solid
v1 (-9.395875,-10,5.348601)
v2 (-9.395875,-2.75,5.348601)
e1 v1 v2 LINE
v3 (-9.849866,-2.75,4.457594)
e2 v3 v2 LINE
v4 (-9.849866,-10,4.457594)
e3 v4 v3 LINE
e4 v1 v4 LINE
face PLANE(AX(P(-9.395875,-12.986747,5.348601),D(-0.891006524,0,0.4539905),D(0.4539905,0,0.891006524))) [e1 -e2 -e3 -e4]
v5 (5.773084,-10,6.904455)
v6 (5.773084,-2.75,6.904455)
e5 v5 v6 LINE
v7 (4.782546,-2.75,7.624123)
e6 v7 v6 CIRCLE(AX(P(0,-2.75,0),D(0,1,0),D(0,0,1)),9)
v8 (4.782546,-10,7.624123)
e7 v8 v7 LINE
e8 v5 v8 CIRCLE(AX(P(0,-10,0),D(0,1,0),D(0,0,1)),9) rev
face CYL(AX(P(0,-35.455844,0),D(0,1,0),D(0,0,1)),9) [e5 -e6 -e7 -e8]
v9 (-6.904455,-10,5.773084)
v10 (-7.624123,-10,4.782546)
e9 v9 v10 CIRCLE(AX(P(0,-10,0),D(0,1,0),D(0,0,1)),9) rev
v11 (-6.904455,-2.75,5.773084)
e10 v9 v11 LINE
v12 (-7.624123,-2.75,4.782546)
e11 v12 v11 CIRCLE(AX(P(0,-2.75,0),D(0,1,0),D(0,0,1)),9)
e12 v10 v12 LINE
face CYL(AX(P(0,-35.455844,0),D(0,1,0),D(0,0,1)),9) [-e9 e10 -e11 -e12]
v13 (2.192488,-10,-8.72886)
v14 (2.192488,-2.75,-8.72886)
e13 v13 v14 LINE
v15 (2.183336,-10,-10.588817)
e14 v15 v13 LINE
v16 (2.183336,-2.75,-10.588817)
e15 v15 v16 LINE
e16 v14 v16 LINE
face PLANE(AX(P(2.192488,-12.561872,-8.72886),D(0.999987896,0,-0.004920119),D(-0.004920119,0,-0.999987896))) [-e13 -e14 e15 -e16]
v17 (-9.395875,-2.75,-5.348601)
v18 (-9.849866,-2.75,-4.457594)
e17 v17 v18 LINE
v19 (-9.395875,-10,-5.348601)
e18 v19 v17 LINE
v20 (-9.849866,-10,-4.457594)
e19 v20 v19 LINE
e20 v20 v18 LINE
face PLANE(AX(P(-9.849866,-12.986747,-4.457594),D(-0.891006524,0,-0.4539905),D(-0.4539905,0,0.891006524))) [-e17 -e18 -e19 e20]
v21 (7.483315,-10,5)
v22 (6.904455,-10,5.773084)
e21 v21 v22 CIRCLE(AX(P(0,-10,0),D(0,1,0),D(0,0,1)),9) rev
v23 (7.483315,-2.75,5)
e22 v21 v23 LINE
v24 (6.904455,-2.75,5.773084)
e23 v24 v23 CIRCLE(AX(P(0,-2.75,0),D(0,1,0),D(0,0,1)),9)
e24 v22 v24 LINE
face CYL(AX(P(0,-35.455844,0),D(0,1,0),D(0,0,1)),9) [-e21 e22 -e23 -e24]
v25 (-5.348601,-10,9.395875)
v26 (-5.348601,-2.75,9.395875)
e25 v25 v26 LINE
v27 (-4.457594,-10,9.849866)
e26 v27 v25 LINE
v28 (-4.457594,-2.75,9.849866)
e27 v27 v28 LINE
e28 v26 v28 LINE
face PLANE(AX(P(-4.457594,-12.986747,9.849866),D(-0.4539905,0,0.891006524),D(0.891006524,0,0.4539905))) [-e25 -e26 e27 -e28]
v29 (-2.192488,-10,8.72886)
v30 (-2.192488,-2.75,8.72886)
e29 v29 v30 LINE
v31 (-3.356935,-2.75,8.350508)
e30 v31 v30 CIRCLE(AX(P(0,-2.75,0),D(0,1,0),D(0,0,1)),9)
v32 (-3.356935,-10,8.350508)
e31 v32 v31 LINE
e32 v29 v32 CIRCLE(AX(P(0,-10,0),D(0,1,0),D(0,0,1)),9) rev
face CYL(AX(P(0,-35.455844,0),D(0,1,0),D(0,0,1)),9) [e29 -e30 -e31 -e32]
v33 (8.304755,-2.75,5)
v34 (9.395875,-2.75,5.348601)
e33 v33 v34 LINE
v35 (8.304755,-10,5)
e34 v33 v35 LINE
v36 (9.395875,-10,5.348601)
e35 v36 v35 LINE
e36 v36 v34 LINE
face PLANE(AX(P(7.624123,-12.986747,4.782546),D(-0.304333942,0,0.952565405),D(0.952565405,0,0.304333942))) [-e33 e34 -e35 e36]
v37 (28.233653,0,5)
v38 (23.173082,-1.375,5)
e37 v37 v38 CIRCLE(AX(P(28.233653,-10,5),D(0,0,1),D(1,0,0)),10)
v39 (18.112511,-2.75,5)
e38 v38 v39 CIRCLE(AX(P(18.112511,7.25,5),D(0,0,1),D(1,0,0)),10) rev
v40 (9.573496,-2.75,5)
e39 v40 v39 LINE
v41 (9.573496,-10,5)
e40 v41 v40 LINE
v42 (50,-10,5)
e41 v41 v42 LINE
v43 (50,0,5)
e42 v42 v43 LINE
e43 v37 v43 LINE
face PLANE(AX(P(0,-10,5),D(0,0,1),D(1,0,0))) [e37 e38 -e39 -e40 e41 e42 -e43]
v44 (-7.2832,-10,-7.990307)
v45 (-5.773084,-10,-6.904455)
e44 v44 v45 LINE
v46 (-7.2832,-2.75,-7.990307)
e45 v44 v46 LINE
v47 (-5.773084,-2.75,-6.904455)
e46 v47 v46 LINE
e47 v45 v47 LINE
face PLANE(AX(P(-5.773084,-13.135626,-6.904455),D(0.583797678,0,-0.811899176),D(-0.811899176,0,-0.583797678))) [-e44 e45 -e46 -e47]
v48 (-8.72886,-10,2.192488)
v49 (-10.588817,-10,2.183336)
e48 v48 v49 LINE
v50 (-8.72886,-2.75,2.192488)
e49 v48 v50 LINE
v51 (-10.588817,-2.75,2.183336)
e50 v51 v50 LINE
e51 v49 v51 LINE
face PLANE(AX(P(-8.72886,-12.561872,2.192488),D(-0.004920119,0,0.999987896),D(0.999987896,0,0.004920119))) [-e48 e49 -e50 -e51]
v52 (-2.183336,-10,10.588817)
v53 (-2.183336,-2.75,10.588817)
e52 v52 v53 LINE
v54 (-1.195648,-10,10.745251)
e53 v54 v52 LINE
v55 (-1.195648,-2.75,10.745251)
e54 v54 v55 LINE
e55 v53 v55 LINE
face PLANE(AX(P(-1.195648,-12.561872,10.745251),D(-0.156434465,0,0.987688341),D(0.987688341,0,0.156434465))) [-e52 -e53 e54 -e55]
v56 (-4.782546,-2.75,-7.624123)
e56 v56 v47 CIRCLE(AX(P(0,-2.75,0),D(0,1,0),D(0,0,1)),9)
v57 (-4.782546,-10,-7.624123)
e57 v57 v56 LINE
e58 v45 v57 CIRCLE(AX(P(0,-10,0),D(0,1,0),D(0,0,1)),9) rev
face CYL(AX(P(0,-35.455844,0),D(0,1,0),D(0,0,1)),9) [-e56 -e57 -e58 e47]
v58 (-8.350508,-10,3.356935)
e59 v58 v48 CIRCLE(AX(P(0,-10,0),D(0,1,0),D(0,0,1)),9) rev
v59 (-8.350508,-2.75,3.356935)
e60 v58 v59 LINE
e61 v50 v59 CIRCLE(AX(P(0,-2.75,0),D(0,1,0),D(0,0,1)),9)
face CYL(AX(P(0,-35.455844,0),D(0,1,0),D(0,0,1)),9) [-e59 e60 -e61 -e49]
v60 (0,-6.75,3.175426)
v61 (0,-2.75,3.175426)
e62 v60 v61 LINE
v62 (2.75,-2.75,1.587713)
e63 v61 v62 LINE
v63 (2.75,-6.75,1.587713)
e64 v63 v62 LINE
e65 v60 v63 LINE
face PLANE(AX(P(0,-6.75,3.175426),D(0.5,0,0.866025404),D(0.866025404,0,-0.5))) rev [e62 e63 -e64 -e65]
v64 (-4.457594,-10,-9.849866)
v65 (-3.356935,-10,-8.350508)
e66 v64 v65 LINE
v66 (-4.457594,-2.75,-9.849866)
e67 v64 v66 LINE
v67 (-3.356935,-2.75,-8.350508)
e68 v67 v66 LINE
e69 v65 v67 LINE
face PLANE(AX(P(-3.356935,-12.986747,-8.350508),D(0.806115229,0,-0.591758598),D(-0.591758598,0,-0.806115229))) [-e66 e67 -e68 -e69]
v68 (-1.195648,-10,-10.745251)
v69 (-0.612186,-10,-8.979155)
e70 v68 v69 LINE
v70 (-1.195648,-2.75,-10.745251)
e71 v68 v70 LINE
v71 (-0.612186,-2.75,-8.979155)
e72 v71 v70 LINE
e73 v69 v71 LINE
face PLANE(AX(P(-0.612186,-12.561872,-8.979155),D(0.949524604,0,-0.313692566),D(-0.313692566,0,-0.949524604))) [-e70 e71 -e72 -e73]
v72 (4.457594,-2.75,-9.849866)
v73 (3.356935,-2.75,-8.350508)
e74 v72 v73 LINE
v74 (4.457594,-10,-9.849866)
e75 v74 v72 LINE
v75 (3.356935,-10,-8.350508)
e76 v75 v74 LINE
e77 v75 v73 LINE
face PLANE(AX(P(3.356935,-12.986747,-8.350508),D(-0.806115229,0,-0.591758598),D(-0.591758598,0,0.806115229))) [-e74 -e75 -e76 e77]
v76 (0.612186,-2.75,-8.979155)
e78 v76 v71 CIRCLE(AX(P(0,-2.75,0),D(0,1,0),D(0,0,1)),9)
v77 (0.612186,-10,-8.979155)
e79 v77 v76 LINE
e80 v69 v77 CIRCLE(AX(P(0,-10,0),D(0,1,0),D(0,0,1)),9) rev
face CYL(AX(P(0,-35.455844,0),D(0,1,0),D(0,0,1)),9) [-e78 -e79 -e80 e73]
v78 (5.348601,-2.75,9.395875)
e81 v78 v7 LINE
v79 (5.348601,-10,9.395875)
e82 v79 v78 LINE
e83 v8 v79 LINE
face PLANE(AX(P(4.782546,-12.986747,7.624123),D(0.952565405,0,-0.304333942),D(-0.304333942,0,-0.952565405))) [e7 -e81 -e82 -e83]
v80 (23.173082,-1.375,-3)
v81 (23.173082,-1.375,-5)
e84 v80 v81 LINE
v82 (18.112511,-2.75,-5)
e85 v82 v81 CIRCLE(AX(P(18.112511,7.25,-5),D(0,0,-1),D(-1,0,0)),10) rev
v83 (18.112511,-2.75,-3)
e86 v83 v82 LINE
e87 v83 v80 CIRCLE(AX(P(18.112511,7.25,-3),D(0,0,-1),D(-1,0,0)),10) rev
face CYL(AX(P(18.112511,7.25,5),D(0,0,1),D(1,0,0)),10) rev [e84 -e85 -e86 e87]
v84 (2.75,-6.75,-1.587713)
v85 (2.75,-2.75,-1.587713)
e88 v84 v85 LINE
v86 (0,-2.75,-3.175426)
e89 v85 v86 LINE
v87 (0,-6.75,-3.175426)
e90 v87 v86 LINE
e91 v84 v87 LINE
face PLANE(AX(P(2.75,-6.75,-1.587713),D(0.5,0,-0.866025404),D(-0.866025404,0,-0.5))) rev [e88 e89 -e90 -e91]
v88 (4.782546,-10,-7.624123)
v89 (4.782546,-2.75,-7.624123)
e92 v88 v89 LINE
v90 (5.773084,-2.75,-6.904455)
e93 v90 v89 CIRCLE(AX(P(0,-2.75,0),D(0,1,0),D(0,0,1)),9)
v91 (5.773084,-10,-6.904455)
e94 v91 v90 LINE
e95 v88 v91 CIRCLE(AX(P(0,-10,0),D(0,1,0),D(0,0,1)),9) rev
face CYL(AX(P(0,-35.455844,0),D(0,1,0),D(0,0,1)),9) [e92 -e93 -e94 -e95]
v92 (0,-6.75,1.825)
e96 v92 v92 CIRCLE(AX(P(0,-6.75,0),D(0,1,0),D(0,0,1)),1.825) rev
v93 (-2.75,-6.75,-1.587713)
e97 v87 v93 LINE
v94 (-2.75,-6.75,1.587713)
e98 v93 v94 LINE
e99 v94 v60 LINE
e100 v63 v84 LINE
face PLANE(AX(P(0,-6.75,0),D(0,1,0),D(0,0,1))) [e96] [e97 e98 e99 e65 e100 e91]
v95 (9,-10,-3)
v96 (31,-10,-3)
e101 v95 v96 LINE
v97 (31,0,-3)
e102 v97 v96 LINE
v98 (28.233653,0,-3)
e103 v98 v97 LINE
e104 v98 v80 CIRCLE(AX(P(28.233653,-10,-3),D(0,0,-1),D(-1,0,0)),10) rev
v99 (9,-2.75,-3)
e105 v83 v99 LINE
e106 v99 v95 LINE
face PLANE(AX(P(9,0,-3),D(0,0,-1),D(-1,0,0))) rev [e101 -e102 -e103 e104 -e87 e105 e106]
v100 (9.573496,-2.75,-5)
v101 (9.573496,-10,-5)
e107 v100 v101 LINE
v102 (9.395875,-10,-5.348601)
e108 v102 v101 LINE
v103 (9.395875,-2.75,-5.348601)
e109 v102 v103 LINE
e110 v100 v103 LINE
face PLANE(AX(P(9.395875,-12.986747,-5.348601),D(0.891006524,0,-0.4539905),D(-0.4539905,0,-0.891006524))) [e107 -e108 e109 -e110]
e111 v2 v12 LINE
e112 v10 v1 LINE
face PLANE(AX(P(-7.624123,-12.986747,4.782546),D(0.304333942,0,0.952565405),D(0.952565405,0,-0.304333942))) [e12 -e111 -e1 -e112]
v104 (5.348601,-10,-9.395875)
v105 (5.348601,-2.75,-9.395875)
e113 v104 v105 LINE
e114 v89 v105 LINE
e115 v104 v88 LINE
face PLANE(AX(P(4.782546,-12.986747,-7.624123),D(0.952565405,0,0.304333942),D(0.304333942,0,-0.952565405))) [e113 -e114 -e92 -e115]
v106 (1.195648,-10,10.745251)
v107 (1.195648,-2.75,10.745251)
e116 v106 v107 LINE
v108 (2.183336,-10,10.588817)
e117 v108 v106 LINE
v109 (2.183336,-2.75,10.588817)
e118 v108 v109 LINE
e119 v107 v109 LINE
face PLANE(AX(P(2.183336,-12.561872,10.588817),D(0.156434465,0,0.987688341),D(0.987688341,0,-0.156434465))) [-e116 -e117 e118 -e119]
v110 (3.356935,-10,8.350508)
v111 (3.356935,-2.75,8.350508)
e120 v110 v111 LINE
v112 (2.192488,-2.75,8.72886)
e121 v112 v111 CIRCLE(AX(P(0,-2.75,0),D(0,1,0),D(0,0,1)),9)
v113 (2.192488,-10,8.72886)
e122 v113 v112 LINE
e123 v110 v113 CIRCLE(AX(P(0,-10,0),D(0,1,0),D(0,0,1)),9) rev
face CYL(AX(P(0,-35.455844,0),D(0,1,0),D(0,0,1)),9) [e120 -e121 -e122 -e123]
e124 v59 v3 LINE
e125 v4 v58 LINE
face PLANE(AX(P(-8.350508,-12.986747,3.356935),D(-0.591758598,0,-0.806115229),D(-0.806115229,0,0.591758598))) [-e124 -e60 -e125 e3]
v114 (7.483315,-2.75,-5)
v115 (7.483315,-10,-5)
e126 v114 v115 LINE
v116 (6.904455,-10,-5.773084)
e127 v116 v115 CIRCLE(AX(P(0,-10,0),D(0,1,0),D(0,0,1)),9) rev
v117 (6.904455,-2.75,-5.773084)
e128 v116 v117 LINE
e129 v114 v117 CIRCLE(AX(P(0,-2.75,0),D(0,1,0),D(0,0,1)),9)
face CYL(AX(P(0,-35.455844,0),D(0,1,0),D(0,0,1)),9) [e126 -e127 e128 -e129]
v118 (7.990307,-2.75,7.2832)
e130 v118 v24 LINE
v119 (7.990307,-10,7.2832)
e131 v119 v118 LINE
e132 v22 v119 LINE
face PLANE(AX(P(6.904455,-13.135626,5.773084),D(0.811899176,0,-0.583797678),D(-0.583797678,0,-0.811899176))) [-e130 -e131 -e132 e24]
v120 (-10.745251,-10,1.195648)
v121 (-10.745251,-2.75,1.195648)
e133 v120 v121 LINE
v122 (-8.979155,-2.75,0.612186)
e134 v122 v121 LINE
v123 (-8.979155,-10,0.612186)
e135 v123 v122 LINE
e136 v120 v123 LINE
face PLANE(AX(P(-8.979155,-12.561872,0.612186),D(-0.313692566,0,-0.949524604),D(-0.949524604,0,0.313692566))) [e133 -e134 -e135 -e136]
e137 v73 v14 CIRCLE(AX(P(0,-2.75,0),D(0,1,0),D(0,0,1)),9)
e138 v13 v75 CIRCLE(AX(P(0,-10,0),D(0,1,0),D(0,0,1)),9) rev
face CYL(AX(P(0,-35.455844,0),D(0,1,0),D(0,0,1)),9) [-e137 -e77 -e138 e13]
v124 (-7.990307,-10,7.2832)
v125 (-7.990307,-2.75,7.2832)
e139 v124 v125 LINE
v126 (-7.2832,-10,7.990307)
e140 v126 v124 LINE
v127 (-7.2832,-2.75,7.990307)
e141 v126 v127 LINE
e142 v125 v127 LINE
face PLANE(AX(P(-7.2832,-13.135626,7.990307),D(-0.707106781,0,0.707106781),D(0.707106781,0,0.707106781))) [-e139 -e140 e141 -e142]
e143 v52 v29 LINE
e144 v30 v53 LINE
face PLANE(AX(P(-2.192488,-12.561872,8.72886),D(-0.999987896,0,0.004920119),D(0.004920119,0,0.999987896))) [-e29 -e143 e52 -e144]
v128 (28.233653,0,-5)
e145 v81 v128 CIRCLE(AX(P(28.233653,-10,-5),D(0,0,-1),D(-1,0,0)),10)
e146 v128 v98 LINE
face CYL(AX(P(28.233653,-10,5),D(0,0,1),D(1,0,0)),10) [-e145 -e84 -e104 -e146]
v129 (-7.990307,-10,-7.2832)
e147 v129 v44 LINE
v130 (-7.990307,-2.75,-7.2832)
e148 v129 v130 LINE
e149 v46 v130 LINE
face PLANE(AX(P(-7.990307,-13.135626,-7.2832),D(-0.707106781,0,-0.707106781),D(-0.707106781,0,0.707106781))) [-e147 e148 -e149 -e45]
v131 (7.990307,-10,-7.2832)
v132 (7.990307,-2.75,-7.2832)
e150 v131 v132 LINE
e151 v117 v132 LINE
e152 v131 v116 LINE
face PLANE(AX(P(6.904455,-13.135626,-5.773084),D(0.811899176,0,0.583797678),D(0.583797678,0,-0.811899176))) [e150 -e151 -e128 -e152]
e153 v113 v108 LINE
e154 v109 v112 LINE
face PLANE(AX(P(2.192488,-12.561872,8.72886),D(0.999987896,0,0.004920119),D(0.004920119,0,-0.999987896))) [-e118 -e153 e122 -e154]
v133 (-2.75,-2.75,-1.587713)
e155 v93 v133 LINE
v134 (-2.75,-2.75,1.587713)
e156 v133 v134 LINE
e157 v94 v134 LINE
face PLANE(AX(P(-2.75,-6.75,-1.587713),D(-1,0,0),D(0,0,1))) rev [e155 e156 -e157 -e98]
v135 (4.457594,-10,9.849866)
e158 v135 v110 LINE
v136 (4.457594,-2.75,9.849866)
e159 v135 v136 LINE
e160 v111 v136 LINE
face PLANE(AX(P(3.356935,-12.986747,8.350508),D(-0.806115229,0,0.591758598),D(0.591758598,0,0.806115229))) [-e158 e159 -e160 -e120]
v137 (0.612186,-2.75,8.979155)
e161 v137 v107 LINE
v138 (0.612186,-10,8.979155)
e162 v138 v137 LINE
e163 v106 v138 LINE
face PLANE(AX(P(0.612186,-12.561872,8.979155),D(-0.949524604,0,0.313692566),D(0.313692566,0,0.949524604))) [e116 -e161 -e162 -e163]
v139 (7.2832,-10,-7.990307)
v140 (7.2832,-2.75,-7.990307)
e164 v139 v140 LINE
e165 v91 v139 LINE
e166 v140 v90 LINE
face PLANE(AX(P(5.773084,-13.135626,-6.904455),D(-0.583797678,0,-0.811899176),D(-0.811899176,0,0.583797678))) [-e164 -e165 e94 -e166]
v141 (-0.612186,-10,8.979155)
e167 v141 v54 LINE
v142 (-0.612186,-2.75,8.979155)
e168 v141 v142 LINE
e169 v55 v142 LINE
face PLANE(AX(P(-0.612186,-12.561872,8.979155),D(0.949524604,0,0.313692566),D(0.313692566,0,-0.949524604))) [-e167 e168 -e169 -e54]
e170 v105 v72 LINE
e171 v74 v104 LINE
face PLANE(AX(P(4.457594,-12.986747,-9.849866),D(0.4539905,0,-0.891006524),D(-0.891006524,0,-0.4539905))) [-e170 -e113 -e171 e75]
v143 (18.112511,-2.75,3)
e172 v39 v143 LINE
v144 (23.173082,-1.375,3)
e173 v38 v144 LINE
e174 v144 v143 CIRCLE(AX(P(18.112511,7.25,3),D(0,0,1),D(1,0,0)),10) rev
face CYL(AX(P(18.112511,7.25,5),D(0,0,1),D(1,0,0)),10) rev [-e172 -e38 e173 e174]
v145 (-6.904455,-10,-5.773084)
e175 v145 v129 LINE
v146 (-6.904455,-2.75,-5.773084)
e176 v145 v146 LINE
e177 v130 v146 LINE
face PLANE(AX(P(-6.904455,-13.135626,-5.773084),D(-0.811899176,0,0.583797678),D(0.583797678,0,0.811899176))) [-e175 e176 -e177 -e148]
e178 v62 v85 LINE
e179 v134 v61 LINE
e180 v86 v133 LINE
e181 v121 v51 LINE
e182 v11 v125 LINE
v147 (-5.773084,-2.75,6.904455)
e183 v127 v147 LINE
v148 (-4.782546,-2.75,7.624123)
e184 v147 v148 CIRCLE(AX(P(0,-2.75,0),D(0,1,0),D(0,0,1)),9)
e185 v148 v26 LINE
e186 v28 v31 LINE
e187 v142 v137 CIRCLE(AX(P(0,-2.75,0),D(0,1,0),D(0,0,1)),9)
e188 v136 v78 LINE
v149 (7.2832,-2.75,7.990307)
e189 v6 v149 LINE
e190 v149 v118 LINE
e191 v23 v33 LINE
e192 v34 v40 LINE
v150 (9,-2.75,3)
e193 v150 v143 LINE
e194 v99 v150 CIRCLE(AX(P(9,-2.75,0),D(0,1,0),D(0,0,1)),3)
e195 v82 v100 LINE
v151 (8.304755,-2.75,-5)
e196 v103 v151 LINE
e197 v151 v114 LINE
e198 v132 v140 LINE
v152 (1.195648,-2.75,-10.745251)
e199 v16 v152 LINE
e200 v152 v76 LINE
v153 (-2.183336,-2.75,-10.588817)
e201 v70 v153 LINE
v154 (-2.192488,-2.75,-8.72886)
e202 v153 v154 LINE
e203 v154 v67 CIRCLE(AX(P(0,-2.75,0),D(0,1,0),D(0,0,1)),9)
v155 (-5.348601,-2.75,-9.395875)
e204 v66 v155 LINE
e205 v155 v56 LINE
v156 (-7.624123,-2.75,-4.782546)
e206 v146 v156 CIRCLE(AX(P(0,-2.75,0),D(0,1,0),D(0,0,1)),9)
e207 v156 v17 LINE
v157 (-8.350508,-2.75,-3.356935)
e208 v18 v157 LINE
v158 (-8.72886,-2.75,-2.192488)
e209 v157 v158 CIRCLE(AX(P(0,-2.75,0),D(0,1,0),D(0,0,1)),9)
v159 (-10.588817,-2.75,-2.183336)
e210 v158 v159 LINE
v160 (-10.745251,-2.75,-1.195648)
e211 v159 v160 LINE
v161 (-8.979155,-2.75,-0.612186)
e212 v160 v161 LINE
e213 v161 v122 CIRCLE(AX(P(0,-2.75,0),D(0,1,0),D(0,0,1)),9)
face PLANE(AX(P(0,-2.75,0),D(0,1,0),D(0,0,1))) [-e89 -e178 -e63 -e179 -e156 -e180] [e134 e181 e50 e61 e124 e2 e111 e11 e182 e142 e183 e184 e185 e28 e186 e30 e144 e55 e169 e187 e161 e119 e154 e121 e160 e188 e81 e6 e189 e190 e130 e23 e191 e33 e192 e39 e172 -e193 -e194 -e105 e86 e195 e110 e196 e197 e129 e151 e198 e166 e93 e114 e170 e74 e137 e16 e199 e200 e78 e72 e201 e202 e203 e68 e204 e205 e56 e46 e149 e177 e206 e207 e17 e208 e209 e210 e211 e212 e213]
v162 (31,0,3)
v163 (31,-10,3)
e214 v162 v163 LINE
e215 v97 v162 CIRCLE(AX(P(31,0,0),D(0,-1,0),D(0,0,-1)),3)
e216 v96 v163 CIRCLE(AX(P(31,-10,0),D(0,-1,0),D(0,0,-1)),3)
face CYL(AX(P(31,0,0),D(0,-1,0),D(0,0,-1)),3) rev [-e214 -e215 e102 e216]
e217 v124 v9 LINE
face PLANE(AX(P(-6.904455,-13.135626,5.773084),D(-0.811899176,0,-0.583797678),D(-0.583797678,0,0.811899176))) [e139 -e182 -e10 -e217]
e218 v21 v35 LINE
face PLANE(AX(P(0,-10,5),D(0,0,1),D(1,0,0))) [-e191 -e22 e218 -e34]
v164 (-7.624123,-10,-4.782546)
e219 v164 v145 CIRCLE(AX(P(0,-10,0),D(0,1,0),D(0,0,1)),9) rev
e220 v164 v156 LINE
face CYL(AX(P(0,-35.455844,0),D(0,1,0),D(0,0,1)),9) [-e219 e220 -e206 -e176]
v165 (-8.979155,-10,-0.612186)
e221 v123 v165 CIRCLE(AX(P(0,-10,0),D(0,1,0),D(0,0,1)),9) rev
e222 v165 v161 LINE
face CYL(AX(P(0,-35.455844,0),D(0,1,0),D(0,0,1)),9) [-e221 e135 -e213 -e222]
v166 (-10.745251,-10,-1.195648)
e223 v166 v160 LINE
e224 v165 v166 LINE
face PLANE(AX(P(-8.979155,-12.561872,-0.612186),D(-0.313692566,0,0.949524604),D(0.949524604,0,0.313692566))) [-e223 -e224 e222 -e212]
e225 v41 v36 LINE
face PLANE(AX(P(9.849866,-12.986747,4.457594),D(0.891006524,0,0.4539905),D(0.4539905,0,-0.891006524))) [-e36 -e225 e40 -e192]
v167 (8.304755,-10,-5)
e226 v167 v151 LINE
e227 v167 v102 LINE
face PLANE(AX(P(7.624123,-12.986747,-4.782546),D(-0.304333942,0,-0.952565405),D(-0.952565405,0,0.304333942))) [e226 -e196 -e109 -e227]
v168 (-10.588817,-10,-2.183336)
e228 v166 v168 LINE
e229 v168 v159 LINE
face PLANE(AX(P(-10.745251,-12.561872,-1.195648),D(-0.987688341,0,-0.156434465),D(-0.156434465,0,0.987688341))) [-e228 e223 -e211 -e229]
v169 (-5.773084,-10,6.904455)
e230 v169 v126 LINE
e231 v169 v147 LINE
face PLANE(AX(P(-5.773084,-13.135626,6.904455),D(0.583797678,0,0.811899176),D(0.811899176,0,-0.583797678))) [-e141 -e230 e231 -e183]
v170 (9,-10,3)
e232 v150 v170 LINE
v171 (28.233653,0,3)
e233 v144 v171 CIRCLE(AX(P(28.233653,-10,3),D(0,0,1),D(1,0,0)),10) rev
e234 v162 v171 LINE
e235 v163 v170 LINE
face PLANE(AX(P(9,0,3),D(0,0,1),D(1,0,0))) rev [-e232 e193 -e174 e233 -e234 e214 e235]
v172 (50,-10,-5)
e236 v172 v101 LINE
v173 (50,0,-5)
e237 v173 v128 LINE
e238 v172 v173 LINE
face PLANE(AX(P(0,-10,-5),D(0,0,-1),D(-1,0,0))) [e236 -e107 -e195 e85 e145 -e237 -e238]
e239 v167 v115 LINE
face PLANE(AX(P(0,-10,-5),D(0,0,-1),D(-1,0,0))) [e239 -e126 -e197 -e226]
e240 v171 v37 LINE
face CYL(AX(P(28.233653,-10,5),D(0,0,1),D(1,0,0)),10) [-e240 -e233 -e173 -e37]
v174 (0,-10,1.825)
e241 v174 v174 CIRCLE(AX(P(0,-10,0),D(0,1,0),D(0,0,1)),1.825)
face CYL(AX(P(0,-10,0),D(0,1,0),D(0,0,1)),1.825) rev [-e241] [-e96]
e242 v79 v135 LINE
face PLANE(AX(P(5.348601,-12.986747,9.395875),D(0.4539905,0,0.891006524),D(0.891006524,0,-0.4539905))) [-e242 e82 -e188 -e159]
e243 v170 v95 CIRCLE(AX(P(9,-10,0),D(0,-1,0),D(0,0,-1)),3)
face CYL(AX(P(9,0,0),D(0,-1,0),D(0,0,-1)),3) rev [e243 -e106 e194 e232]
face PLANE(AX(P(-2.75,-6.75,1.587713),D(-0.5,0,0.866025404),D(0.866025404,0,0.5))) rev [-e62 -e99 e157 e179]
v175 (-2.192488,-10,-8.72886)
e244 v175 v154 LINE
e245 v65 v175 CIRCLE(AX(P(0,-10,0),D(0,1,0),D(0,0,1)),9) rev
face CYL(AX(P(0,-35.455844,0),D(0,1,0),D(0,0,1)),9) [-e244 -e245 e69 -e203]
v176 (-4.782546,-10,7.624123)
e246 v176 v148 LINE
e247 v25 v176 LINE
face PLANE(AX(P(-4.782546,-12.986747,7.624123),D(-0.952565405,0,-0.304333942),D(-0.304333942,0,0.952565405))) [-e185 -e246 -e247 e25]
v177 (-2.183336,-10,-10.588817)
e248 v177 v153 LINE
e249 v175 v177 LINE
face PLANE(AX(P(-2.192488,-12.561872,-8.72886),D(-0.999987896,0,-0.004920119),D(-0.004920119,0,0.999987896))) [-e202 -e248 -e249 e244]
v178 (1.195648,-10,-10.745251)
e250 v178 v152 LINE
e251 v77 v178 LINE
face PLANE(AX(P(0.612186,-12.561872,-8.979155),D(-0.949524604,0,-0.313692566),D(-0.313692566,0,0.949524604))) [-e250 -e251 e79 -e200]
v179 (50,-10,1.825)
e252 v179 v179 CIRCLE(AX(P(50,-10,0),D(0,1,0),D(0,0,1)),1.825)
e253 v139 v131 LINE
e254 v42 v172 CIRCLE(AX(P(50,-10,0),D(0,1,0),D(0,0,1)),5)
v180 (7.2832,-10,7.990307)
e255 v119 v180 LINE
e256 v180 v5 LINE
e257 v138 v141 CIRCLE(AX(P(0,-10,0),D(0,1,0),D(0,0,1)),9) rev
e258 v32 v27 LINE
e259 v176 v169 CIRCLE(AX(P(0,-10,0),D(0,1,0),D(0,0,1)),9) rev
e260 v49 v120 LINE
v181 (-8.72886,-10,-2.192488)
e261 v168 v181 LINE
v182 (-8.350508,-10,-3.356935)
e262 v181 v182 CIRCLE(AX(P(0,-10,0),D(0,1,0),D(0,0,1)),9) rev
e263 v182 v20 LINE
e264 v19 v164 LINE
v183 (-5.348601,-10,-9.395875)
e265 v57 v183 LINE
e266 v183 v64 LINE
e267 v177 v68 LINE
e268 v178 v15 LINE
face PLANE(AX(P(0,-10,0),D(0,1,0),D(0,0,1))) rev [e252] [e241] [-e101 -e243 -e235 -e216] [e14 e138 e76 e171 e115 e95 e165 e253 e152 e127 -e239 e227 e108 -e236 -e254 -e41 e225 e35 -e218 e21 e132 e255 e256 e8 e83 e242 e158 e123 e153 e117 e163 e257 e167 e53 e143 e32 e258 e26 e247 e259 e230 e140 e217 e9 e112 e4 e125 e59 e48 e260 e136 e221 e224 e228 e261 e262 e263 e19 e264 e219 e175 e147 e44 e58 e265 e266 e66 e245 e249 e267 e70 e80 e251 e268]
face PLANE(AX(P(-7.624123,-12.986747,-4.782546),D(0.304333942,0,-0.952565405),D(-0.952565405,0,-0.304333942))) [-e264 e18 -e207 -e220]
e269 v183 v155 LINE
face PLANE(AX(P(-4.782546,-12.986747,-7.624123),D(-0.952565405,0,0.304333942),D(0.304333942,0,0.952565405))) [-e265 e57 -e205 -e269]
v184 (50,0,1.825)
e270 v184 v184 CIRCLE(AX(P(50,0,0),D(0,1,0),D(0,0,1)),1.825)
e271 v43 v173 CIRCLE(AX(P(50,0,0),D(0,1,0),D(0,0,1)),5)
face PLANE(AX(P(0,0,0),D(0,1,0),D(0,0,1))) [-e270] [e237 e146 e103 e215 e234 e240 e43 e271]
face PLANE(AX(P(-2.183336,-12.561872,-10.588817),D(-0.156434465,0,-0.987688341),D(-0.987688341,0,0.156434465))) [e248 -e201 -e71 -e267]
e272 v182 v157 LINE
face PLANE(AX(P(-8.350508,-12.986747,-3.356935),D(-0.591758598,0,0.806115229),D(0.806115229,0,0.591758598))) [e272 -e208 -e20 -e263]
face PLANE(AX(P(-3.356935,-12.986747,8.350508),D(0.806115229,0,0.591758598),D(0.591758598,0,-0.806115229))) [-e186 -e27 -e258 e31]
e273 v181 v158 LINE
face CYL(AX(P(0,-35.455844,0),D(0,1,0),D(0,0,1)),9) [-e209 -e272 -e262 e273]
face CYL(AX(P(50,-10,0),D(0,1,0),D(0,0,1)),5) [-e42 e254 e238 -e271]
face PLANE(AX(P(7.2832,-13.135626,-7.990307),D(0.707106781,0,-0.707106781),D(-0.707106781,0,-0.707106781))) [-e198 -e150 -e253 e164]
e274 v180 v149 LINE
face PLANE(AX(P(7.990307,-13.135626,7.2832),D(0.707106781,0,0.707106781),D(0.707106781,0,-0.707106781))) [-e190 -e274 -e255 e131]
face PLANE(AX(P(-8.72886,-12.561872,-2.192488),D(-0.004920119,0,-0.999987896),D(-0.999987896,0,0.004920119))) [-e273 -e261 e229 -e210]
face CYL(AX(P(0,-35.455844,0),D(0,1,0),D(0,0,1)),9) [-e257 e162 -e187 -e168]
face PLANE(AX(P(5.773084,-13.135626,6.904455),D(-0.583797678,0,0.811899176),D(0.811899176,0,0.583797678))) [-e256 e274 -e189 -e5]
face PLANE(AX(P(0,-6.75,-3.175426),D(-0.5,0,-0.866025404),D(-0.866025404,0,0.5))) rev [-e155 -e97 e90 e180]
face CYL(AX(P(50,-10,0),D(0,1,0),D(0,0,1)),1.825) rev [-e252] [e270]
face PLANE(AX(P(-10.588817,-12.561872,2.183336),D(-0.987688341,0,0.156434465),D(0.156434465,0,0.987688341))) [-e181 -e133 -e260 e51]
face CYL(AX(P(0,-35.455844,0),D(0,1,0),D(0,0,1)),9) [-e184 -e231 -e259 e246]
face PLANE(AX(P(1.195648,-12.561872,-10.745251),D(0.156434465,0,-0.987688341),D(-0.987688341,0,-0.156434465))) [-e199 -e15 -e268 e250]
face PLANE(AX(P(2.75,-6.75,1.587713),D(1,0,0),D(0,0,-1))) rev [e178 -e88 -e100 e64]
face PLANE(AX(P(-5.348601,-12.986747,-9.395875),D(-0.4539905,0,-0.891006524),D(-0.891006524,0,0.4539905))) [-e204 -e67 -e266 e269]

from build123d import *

# Parameters (mm, degrees)
SKIZZE1_R                       = 1.825
AUFSATZ_LINEAR_AUSTRAGEN1_DEPTH = 10
SCHNITT_LINEAR_AUSTRAGEN1_DEPTH = 2.75
VERRUNDUNG1_R                   = 10
VERRUNDUNG2_R                   = 10
SKIZZE2_R                       = 9
SKIZZE2_R_2                     = 5
AUFSATZ_LINEAR_AUSTRAGEN2_DEPTH = 7.25
AUFSATZ_LINEAR_AUSTRAGEN3_DEPTH = 7.25
KREISMUSTER1_COUNT              = 20
SCHNITT_LINEAR_AUSTRAGEN3_DEPTH = 4
SCHNITT_LINEAR_AUSTRAGEN4_DEPTH = 57.925042167


with BuildPart() as part:
    # Skizze1 → Aufsatz-Linear austragen1 (new body)
    with BuildSketch(Plane(origin=(0, 0, 0), x_dir=(1, 0, 0), z_dir=(0, 1, 0))):
        with BuildLine():
            Line((0, 5), (50, 5))
            ThreePointArc((50, 5), (55, 0), (50, -5))
            Line((50, -5), (0, -5))
            ThreePointArc((0, -5), (-5, 0), (0, 5))
        make_face()
        with Locations(Location((50, 0, 0), (0, 0, 270))):
            Circle(SKIZZE1_R, mode=Mode.SUBTRACT)
        with Locations(Location((0, 0, 0), (0, 0, 270))):
            Circle(SKIZZE1_R, mode=Mode.SUBTRACT)
    extrude(amount=-AUFSATZ_LINEAR_AUSTRAGEN1_DEPTH)

    # Skizze5 → Schnitt-Linear austragen1 (cut)
    with BuildSketch(Plane(origin=(0, 0, 0), x_dir=(1, 0, 0), z_dir=(0, 1, 0))):
        with BuildLine():
            Line((0, -5), (25, -5))
            Line((25, -5), (25, 5))
            Line((25, 5), (0, 5))
            ThreePointArc((0, 5), (-5, 0), (0, -5))
        make_face()
    extrude(amount=-SCHNITT_LINEAR_AUSTRAGEN1_DEPTH, mode=Mode.SUBTRACT)

    # Verrundung1
    # the kernel refuses this fillet: 10 mm, written as the material it adds along each edge
    with BuildSketch(Plane(origin=(25, -2.75, 5), x_dir=(-1, 0, 0), z_dir=(0, 0, -1))) as verrundung1_piece_1:
        with BuildLine():
            CenterArc((6.887488657, 10), VERRUNDUNG1_R, 226.468847833, 43.531152167)
            Line((0, 2.75), (-0.137749773, 2.605))
            ThreePointArc((-0.137749773, 2.605), (-0.2, 1.375), (-0.2, 0))
            Line((-0.2, 0), (0, -0.2))
            Line((0, -0.2), (6.887488657, -0.2))
            Line((6.887488657, -0.2), (6.887488657, 0))
        make_face()
    extrude(amount=10)

    # Verrundung2
    verrundung2_edges = [part.edges().sort_by_distance(p)[0] for p in [
        (25, 0, 0),
    ]]
    fillet(verrundung2_edges, radius=VERRUNDUNG2_R)

    # Skizze2 → Aufsatz-Linear austragen2 (add)
    with BuildSketch(Plane(origin=(0, -2.75, 0), x_dir=(1, 0, 0), z_dir=(0, 1, 0))):
        Circle(SKIZZE2_R)
        Circle(SKIZZE2_R_2, mode=Mode.SUBTRACT)
    extrude(amount=-AUFSATZ_LINEAR_AUSTRAGEN2_DEPTH)

    # Skizze3 → Aufsatz-Linear austragen3 (add)
    with BuildSketch(Plane(origin=(0, -2.75, 0), x_dir=(1, 0, 0), z_dir=(0, 1, 0))):
        with BuildLine():
            Line((-8.979155186, 0.612186368), (-10.745251311, 1.195648052))
            Line((-10.745251311, 1.195648052), (-10.588816846, 2.183336393))
            Line((-10.588816846, 2.183336393), (-8.728860042, 2.192487713))
            ThreePointArc((-8.728860042, 2.192487713), (-8.889195065, 1.407910185), (-8.979155186, 0.612186368))
        make_face()
    aufsatz_linear_austragen3 = extrude(amount=-AUFSATZ_LINEAR_AUSTRAGEN3_DEPTH)

    # Kreismuster1: Aufsatz-Linear austragen3 ×20 about axis
    kreismuster1_axis = Axis((0, 0, 0), (0, 1, 0))
    for i in range(1, KREISMUSTER1_COUNT):
        add(aufsatz_linear_austragen3.rotate(kreismuster1_axis, i * 360 / KREISMUSTER1_COUNT))

    # Skizze8 → Schnitt-Linear austragen3 (cut)
    with BuildSketch(Plane(origin=(0, -2.75, 0), x_dir=(1, 0, 0), z_dir=(0, 1, 0))):
        Polygon((0, 3.175426481), (-2.75, 1.58771324), (-2.75, -1.58771324), (0, -3.175426481), (2.75, -1.58771324), (2.75, 1.58771324), align=None)
    extrude(amount=-SCHNITT_LINEAR_AUSTRAGEN3_DEPTH, mode=Mode.SUBTRACT)

    # Skizze10 → Schnitt-Linear austragen4 (cut, through all)
    with BuildSketch(Plane.XZ.offset(10)):
        with BuildLine():
            Line((9, 3), (31, 3))
            ThreePointArc((31, 3), (34, 0), (31, -3))
            Line((31, -3), (9, -3))
            ThreePointArc((9, -3), (6, 0), (9, 3))
        make_face()
    extrude(amount=-SCHNITT_LINEAR_AUSTRAGEN4_DEPTH, mode=Mode.SUBTRACT)


solid = part.part
